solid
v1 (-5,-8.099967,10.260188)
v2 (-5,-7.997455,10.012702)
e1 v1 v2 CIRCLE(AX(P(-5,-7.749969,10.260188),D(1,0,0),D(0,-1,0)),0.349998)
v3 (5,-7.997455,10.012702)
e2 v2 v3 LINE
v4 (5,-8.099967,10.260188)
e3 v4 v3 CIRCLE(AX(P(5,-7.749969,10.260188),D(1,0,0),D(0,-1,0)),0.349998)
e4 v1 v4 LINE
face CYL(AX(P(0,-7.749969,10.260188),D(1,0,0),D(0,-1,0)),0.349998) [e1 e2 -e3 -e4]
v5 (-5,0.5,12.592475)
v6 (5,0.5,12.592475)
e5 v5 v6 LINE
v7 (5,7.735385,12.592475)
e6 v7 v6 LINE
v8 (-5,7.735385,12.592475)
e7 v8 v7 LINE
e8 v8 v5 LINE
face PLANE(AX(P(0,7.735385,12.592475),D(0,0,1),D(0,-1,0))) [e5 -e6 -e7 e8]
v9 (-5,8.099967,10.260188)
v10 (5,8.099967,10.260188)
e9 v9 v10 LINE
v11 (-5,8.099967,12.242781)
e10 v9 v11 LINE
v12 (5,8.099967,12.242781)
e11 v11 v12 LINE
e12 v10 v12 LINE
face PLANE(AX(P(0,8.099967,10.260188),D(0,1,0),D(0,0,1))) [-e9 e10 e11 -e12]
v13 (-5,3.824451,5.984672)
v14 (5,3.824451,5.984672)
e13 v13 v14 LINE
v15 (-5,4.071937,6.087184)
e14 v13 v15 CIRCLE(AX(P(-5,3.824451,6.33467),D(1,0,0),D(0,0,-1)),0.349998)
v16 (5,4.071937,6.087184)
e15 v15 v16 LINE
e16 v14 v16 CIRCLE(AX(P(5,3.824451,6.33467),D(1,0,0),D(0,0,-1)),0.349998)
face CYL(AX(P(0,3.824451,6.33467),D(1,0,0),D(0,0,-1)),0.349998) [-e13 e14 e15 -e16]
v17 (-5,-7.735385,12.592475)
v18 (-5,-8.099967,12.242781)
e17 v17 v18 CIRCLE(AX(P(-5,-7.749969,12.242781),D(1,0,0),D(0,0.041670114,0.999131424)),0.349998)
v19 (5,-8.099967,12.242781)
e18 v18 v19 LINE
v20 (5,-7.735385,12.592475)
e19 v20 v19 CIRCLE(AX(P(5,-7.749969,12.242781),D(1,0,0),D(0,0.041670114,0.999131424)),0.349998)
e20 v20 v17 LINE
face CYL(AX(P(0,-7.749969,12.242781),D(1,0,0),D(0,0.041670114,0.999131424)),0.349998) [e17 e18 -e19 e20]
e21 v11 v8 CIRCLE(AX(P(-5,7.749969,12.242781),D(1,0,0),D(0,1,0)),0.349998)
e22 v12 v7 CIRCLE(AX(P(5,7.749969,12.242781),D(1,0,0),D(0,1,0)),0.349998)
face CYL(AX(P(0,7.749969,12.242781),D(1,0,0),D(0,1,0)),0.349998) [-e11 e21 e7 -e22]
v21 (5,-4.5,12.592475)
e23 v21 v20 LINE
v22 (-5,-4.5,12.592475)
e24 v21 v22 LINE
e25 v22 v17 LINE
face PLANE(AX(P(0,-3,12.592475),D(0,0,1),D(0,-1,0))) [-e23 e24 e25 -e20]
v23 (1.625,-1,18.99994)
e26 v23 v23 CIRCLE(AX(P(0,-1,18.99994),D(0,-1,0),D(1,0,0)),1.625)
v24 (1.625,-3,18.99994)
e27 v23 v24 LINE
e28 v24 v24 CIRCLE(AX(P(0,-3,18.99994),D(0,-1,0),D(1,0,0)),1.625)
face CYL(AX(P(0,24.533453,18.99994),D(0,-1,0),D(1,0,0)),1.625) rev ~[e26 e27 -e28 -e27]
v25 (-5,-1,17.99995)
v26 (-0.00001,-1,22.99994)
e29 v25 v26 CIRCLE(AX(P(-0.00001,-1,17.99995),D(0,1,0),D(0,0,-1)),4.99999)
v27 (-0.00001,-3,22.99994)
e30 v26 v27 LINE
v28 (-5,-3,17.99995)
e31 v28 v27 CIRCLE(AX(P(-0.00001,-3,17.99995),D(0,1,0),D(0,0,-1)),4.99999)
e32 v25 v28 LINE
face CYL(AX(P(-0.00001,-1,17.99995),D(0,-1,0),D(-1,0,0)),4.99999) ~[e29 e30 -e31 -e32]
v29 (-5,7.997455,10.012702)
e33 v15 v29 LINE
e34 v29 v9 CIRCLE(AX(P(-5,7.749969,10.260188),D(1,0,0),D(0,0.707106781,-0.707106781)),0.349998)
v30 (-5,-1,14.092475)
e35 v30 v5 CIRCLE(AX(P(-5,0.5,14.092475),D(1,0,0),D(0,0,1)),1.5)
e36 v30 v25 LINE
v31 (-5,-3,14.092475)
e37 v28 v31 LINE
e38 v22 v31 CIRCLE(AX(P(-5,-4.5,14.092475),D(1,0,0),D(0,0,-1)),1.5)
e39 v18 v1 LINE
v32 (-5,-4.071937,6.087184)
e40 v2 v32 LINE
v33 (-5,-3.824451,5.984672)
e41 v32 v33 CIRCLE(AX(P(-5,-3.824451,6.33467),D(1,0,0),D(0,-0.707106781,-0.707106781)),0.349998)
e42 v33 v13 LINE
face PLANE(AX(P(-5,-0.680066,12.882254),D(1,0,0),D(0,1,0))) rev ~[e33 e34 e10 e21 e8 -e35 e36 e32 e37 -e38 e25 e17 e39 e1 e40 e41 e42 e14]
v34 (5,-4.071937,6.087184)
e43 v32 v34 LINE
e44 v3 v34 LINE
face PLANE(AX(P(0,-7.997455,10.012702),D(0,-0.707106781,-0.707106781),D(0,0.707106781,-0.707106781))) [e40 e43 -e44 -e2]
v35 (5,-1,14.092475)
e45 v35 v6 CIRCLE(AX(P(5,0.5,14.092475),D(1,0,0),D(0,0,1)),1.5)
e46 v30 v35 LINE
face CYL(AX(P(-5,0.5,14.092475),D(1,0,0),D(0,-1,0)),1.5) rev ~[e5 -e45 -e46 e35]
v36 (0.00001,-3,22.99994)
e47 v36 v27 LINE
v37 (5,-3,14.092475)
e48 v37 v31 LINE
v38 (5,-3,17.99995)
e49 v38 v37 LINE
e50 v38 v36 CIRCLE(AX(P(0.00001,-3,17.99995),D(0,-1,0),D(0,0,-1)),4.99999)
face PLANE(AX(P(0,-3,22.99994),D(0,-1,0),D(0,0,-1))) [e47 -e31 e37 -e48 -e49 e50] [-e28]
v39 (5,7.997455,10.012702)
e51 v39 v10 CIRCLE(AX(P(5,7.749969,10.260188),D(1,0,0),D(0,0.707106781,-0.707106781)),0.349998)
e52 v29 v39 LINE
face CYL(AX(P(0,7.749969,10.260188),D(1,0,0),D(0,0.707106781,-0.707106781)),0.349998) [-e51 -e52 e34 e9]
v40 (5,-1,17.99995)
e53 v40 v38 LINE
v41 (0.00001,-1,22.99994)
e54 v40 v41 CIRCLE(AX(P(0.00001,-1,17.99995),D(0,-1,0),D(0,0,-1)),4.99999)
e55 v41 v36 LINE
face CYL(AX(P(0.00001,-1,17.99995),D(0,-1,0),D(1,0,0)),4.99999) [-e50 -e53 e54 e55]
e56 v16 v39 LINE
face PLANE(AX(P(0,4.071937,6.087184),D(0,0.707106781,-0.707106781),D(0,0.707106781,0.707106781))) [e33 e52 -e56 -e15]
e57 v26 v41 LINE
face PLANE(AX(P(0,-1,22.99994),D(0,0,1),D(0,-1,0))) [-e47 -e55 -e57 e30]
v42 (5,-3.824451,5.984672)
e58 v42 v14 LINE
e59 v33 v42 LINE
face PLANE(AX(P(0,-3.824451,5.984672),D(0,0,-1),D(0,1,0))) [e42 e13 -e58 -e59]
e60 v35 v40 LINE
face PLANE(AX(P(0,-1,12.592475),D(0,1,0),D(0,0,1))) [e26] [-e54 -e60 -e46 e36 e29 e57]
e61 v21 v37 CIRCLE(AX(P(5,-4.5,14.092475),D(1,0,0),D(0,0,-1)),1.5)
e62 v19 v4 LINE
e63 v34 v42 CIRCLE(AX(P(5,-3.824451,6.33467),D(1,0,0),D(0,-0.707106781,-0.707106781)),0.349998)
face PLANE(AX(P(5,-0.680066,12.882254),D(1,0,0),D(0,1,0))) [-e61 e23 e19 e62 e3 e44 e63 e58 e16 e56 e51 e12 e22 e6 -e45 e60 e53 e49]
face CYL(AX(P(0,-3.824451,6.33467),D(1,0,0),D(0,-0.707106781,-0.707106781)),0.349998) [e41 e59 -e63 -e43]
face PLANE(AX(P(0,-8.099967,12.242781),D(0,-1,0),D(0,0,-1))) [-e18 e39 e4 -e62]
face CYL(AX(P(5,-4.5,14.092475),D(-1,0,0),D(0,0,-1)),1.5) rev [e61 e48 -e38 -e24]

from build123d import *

# Parameters (mm, degrees)
F2_DEPTH = 5
F3_R     = 1.5
F4_R     = 4.99999
F6_D     = 3.25


# Not quite as in the source:
# - a fillet or chamfer is up to 0.001 mm smaller than in the source, because OpenCascade refuses the exact size


with BuildPart() as f2:
    # F1 (on Right) → F2 (new body, symmetric)
    with BuildSketch(Plane.YZ):
        with BuildLine():
            Line((-4.5, 12.592475), (-7.7353845436, 12.592475))
            ThreePointArc((-7.7353845436, 12.592475), (-7.9922437092, 12.4953707173), (-8.099967, 12.242781))
            Line((-8.099967, 12.242781), (-8.099967, 10.260188))
            ThreePointArc((-8.099967, 10.260188), (-8.0733249886, 10.126249564), (-7.9974549592, 10.0127020408))
            Line((-7.9974549828, 10.0127020172), (-4.0719369828, 6.0871840172))
            ThreePointArc((-4.0719369592, 6.0871840408), (-3.958389436, 6.0113140114), (-3.824451, 5.984672))
            Line((-3.824451, 5.984672), (-0.949996, 5.984672))
            Line((-0.949996, 5.984672), (0.949996, 5.984672))
            Line((0.949996, 5.984672), (3.824451, 5.984672))
            ThreePointArc((3.824451, 5.984672), (3.958389436, 6.0113140114), (4.0719369592, 6.0871840408))
            Line((4.0719369828, 6.0871840172), (7.9974549828, 10.0127020172))
            ThreePointArc((7.9974549592, 10.0127020408), (8.0733249886, 10.126249564), (8.099967, 10.260188))
            Line((8.099967, 10.260188), (8.099967, 12.242781))
            ThreePointArc((8.099967, 12.242781), (7.9922437092, 12.4953707173), (7.7353845436, 12.592475))
            Line((7.7353845436, 12.592475), (4.5, 12.592475))
            Line((4.5, 12.592475), (-1, 12.592475))
            Line((-1, 12.592475), (-1, 22.99994))
            Line((-1, 22.99994), (-3, 22.99994))
            Line((-3, 22.99994), (-3, 12.592475))
            Line((-3, 12.592475), (-4.5, 12.592475))
        make_face()
    extrude(amount=F2_DEPTH, both=True)

    # F3
    f3_edges = [f2.edges().sort_by_distance(p)[0] for p in [
        (0, -3, 12.592475),
        (0, -1, 12.592475),
    ]]
    fillet(f3_edges, radius=F3_R)

    # F4 (radius 5 in the source; OpenCascade refuses exactly that, so slightly less here)
    f4_edges = [f2.edges().sort_by_distance(p)[0] for p in [
        (5, -2, 22.99994),
        (-5, -2, 22.99994),
    ]]
    fillet(f4_edges, radius=F4_R)

    # F6 (through all)
    with Locations(Plane(origin=(0, -1, 0), x_dir=(-1, 0, 0), z_dir=(0, 1, 0))):
        with Locations((0, 18.99994)):
            Hole(F6_D / 2)


solid = f2.part
